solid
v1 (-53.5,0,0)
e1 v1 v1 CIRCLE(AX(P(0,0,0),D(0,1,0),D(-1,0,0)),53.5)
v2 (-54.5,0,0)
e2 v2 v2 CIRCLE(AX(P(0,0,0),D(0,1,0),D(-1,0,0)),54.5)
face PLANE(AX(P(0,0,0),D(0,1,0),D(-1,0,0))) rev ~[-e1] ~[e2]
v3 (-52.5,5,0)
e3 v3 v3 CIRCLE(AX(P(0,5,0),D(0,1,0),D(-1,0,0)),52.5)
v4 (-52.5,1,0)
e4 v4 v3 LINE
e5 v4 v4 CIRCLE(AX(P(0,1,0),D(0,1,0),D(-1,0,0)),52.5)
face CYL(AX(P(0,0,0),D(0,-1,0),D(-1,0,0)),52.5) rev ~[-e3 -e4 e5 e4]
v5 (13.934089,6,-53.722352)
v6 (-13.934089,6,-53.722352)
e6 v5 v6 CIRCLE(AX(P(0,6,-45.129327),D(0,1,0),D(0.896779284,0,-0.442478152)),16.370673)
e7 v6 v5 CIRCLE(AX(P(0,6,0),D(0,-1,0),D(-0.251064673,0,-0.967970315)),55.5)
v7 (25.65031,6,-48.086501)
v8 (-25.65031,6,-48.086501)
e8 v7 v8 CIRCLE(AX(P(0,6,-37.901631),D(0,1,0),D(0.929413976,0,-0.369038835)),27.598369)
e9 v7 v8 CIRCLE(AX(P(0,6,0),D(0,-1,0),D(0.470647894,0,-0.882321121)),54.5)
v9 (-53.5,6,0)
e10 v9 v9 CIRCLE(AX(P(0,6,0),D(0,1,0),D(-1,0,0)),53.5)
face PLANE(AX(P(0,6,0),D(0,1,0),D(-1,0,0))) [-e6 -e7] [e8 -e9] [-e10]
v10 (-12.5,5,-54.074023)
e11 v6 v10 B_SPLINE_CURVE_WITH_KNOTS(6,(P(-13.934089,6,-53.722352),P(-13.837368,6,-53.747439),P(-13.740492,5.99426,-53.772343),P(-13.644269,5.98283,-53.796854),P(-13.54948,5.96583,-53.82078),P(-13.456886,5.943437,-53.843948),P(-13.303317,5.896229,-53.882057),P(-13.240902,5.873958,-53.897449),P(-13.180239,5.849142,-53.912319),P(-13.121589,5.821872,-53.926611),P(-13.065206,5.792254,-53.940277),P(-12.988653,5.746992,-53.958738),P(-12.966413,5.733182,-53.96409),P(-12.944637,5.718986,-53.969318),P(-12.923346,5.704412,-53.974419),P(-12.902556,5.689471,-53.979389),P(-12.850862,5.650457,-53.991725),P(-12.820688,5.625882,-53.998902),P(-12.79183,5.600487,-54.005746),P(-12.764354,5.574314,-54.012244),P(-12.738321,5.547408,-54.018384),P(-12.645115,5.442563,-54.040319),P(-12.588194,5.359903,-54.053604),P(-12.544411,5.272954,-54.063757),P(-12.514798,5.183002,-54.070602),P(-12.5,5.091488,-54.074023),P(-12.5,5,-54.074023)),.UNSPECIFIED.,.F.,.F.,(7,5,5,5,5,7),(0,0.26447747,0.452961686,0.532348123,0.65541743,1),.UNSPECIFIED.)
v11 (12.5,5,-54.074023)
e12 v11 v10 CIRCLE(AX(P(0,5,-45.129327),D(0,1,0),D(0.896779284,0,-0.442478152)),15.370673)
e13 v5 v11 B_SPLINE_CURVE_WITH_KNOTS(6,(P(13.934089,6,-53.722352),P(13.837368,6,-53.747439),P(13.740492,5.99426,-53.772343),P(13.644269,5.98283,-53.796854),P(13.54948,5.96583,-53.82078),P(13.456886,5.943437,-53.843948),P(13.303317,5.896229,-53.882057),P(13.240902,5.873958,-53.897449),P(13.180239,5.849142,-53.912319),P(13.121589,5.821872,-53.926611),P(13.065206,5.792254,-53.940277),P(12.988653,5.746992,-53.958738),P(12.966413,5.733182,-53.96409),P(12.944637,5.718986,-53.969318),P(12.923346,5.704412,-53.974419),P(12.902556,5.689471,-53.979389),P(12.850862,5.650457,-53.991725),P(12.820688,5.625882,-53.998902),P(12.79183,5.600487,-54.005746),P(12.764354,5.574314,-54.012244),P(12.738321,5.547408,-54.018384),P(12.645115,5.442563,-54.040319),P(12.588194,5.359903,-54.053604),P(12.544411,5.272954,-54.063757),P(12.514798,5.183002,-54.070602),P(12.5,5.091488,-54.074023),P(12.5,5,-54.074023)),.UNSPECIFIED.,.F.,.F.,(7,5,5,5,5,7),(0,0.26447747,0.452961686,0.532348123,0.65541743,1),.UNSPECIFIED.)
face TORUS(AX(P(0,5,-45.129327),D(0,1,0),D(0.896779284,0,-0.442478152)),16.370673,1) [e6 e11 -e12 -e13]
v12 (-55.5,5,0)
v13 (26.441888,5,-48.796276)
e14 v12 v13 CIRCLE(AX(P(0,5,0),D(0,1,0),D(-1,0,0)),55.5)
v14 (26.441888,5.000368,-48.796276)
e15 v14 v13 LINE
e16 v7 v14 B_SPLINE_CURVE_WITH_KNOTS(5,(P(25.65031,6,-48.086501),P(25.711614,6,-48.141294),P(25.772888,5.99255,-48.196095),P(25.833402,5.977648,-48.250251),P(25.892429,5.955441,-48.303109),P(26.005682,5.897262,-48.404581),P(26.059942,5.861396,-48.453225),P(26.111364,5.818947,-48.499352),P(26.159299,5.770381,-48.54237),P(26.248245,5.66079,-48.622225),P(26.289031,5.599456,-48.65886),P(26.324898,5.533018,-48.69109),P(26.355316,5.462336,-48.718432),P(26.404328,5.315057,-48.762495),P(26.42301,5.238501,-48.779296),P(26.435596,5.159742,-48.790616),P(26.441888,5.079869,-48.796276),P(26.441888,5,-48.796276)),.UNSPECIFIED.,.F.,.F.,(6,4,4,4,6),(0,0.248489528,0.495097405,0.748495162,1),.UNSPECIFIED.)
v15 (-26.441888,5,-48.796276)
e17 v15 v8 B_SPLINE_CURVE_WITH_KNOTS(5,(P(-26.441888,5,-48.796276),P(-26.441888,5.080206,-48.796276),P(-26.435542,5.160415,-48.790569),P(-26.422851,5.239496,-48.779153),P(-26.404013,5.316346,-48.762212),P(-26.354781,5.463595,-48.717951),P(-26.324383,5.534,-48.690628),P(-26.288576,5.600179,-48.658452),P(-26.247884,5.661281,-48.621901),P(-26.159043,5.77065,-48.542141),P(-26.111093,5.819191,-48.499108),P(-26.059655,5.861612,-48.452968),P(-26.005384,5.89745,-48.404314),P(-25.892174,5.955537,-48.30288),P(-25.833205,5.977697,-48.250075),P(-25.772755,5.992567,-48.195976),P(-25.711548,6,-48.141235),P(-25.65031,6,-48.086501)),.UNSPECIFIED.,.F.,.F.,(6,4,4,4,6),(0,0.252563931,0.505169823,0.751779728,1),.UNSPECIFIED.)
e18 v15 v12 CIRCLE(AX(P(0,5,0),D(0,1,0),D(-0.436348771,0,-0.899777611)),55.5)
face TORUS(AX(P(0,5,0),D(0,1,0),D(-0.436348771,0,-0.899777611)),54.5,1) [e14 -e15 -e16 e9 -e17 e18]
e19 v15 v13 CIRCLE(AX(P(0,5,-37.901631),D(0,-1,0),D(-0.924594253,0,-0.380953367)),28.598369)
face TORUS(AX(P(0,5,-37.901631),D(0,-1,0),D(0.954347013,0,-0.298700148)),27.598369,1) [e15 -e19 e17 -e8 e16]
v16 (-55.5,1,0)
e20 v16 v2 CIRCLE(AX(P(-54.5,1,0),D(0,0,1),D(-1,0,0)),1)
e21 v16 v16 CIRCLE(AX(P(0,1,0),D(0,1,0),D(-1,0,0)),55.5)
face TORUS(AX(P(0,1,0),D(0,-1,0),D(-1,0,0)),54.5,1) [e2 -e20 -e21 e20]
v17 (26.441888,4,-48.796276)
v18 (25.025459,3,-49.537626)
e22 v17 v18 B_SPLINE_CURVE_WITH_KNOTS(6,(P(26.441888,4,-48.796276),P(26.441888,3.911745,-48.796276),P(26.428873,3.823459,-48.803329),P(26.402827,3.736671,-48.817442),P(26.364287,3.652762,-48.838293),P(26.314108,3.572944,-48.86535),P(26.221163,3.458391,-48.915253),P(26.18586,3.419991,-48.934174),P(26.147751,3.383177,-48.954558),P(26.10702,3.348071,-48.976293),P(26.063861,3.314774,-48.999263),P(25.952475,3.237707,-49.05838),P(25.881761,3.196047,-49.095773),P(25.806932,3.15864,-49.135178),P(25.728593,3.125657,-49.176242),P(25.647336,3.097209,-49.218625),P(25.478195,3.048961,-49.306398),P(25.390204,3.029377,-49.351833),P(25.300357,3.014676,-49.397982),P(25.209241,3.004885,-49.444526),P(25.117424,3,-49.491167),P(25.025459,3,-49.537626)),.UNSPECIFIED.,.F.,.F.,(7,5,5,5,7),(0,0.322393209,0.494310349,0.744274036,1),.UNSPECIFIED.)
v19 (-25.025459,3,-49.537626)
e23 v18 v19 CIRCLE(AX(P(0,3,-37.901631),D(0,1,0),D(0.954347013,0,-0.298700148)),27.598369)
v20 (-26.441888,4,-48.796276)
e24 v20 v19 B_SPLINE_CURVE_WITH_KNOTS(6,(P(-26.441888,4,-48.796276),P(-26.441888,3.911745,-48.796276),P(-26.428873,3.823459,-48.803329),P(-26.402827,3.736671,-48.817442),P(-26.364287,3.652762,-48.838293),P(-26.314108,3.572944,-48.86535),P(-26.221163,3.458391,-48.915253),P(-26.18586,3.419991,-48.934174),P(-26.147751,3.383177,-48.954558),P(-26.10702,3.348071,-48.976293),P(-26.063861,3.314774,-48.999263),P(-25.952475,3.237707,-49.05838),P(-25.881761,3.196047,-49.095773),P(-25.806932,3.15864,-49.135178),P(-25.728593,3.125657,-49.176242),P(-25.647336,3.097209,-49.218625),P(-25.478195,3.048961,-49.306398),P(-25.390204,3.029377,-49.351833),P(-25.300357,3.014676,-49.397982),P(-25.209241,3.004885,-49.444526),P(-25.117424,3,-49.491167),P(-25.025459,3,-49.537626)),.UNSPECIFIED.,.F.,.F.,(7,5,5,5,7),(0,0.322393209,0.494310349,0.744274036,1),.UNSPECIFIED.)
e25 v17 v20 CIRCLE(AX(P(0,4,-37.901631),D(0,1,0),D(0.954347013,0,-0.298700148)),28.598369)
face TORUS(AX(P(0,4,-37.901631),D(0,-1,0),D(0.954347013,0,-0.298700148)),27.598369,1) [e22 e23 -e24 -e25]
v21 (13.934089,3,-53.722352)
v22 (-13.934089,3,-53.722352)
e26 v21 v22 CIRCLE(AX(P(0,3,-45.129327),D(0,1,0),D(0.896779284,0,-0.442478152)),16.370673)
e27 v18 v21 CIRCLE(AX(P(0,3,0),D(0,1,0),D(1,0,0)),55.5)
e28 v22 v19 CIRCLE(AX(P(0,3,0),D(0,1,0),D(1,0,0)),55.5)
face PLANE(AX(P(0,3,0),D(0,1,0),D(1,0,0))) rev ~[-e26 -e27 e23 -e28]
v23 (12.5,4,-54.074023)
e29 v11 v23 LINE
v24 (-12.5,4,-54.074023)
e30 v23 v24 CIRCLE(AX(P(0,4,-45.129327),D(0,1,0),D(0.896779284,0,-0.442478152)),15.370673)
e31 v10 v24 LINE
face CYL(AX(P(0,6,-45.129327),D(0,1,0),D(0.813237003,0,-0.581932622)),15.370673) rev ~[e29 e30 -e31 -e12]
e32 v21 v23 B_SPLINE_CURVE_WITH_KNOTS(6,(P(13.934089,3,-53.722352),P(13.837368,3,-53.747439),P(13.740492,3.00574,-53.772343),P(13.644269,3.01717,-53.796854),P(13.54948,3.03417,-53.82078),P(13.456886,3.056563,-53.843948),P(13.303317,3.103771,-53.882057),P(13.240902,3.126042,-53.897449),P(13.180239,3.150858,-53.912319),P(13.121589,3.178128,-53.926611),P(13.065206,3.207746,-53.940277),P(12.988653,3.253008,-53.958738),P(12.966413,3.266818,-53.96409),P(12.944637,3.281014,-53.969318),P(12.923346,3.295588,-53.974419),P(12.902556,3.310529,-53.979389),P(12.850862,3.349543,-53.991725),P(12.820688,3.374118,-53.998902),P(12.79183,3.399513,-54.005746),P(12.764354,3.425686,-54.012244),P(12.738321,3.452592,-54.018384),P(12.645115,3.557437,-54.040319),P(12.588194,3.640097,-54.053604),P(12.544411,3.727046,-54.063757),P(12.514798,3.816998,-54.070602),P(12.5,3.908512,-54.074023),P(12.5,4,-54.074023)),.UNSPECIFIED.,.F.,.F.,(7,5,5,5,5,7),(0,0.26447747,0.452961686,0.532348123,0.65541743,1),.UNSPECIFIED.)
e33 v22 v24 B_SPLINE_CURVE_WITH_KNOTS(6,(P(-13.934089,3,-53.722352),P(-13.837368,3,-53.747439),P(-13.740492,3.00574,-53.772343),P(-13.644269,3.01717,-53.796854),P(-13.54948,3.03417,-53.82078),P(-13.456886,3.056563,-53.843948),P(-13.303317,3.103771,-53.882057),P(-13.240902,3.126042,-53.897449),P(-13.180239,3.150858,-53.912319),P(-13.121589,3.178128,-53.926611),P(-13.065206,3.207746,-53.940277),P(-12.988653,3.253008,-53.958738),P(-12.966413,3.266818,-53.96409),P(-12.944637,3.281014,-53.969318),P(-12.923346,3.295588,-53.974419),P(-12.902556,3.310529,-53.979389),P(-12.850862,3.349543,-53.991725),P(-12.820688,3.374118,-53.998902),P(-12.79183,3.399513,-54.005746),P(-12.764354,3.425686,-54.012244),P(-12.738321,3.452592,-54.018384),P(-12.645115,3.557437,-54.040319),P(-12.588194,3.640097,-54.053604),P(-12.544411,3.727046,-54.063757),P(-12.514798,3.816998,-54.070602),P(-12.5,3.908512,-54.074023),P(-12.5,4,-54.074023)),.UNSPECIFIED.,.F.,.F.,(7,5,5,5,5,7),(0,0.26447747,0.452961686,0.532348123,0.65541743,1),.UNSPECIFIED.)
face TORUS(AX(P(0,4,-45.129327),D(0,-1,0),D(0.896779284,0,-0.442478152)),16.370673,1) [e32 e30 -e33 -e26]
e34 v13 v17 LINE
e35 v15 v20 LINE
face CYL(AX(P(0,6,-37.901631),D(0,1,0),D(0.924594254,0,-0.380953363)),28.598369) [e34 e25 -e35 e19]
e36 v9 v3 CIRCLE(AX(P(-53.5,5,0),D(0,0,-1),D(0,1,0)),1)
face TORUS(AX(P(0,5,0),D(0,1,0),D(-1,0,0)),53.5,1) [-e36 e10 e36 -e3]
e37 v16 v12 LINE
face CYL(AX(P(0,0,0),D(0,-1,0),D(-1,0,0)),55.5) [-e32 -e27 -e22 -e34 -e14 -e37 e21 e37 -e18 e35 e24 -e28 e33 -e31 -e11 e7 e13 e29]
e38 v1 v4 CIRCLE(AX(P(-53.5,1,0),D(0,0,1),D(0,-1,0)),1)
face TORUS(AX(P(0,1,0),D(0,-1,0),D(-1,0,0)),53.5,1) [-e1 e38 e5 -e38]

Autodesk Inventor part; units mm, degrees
ref_plane "YZ Plane" through (0, 0, 0) normal (1, 0, 0) x (0, 1, 0)
ref_plane "XZ Plane" through (0, 0, 0) normal (0, 1, 0) x (-1, 0, 0)
ref_plane "XY Plane" through (0, 0, 0) normal (0, 0, 1) x (1, 0, 0)
sketch "Sketch1" plane through (0, 0, 0) normal (0, 1, 0) x (-1, 0, 0)
  circle A0 centre (0, 0) radius 52.5
  circle A1 centre (0, 0) radius 55.5
  dimension "d0" = 105
  dimension "d1" = 3
extrude "Extrusion1" add sketch "Sketch1" along normal blind 6
sketch "Sketch2" plane through (0, 6, 0) normal (0, 1, 0) x (1, 0, 0)
  circle A0 centre (0, 0) radius 52.5
  circle A1 centre (0, 0) radius 55.5
  circle A2 centre (0, 0) radius 55.5 construction
  arc A3 (12.5, 54.074023) -> (-12.5, 54.074023) centre (0, 45.129327) ccw
  arc A4 (26.441888, 48.796276) -> (-26.441888, 48.796276) centre (0, 37.901631) ccw
  dimension "d4" = 6
  dimension "d5" = 25
  dimension "d6" = 5
  dimension "d7" = 52.88378
extrude "Extrusion2" add sketch "Sketch2" against normal blind 3 contours A1 A3 A4
fillet "Fillet1" radius 1 9 edges at (-47.6853, 6, -28.3965) (28.3965, 6, 47.6853) (52.5, 6, 0) (55.5, 0, 0) (52.5, 0, 0) (0, 6, -66.5) (0, 6, -60.5) (0, 3, -60.5) (0, 3, -66.5)
properties part number "BladderHook"
